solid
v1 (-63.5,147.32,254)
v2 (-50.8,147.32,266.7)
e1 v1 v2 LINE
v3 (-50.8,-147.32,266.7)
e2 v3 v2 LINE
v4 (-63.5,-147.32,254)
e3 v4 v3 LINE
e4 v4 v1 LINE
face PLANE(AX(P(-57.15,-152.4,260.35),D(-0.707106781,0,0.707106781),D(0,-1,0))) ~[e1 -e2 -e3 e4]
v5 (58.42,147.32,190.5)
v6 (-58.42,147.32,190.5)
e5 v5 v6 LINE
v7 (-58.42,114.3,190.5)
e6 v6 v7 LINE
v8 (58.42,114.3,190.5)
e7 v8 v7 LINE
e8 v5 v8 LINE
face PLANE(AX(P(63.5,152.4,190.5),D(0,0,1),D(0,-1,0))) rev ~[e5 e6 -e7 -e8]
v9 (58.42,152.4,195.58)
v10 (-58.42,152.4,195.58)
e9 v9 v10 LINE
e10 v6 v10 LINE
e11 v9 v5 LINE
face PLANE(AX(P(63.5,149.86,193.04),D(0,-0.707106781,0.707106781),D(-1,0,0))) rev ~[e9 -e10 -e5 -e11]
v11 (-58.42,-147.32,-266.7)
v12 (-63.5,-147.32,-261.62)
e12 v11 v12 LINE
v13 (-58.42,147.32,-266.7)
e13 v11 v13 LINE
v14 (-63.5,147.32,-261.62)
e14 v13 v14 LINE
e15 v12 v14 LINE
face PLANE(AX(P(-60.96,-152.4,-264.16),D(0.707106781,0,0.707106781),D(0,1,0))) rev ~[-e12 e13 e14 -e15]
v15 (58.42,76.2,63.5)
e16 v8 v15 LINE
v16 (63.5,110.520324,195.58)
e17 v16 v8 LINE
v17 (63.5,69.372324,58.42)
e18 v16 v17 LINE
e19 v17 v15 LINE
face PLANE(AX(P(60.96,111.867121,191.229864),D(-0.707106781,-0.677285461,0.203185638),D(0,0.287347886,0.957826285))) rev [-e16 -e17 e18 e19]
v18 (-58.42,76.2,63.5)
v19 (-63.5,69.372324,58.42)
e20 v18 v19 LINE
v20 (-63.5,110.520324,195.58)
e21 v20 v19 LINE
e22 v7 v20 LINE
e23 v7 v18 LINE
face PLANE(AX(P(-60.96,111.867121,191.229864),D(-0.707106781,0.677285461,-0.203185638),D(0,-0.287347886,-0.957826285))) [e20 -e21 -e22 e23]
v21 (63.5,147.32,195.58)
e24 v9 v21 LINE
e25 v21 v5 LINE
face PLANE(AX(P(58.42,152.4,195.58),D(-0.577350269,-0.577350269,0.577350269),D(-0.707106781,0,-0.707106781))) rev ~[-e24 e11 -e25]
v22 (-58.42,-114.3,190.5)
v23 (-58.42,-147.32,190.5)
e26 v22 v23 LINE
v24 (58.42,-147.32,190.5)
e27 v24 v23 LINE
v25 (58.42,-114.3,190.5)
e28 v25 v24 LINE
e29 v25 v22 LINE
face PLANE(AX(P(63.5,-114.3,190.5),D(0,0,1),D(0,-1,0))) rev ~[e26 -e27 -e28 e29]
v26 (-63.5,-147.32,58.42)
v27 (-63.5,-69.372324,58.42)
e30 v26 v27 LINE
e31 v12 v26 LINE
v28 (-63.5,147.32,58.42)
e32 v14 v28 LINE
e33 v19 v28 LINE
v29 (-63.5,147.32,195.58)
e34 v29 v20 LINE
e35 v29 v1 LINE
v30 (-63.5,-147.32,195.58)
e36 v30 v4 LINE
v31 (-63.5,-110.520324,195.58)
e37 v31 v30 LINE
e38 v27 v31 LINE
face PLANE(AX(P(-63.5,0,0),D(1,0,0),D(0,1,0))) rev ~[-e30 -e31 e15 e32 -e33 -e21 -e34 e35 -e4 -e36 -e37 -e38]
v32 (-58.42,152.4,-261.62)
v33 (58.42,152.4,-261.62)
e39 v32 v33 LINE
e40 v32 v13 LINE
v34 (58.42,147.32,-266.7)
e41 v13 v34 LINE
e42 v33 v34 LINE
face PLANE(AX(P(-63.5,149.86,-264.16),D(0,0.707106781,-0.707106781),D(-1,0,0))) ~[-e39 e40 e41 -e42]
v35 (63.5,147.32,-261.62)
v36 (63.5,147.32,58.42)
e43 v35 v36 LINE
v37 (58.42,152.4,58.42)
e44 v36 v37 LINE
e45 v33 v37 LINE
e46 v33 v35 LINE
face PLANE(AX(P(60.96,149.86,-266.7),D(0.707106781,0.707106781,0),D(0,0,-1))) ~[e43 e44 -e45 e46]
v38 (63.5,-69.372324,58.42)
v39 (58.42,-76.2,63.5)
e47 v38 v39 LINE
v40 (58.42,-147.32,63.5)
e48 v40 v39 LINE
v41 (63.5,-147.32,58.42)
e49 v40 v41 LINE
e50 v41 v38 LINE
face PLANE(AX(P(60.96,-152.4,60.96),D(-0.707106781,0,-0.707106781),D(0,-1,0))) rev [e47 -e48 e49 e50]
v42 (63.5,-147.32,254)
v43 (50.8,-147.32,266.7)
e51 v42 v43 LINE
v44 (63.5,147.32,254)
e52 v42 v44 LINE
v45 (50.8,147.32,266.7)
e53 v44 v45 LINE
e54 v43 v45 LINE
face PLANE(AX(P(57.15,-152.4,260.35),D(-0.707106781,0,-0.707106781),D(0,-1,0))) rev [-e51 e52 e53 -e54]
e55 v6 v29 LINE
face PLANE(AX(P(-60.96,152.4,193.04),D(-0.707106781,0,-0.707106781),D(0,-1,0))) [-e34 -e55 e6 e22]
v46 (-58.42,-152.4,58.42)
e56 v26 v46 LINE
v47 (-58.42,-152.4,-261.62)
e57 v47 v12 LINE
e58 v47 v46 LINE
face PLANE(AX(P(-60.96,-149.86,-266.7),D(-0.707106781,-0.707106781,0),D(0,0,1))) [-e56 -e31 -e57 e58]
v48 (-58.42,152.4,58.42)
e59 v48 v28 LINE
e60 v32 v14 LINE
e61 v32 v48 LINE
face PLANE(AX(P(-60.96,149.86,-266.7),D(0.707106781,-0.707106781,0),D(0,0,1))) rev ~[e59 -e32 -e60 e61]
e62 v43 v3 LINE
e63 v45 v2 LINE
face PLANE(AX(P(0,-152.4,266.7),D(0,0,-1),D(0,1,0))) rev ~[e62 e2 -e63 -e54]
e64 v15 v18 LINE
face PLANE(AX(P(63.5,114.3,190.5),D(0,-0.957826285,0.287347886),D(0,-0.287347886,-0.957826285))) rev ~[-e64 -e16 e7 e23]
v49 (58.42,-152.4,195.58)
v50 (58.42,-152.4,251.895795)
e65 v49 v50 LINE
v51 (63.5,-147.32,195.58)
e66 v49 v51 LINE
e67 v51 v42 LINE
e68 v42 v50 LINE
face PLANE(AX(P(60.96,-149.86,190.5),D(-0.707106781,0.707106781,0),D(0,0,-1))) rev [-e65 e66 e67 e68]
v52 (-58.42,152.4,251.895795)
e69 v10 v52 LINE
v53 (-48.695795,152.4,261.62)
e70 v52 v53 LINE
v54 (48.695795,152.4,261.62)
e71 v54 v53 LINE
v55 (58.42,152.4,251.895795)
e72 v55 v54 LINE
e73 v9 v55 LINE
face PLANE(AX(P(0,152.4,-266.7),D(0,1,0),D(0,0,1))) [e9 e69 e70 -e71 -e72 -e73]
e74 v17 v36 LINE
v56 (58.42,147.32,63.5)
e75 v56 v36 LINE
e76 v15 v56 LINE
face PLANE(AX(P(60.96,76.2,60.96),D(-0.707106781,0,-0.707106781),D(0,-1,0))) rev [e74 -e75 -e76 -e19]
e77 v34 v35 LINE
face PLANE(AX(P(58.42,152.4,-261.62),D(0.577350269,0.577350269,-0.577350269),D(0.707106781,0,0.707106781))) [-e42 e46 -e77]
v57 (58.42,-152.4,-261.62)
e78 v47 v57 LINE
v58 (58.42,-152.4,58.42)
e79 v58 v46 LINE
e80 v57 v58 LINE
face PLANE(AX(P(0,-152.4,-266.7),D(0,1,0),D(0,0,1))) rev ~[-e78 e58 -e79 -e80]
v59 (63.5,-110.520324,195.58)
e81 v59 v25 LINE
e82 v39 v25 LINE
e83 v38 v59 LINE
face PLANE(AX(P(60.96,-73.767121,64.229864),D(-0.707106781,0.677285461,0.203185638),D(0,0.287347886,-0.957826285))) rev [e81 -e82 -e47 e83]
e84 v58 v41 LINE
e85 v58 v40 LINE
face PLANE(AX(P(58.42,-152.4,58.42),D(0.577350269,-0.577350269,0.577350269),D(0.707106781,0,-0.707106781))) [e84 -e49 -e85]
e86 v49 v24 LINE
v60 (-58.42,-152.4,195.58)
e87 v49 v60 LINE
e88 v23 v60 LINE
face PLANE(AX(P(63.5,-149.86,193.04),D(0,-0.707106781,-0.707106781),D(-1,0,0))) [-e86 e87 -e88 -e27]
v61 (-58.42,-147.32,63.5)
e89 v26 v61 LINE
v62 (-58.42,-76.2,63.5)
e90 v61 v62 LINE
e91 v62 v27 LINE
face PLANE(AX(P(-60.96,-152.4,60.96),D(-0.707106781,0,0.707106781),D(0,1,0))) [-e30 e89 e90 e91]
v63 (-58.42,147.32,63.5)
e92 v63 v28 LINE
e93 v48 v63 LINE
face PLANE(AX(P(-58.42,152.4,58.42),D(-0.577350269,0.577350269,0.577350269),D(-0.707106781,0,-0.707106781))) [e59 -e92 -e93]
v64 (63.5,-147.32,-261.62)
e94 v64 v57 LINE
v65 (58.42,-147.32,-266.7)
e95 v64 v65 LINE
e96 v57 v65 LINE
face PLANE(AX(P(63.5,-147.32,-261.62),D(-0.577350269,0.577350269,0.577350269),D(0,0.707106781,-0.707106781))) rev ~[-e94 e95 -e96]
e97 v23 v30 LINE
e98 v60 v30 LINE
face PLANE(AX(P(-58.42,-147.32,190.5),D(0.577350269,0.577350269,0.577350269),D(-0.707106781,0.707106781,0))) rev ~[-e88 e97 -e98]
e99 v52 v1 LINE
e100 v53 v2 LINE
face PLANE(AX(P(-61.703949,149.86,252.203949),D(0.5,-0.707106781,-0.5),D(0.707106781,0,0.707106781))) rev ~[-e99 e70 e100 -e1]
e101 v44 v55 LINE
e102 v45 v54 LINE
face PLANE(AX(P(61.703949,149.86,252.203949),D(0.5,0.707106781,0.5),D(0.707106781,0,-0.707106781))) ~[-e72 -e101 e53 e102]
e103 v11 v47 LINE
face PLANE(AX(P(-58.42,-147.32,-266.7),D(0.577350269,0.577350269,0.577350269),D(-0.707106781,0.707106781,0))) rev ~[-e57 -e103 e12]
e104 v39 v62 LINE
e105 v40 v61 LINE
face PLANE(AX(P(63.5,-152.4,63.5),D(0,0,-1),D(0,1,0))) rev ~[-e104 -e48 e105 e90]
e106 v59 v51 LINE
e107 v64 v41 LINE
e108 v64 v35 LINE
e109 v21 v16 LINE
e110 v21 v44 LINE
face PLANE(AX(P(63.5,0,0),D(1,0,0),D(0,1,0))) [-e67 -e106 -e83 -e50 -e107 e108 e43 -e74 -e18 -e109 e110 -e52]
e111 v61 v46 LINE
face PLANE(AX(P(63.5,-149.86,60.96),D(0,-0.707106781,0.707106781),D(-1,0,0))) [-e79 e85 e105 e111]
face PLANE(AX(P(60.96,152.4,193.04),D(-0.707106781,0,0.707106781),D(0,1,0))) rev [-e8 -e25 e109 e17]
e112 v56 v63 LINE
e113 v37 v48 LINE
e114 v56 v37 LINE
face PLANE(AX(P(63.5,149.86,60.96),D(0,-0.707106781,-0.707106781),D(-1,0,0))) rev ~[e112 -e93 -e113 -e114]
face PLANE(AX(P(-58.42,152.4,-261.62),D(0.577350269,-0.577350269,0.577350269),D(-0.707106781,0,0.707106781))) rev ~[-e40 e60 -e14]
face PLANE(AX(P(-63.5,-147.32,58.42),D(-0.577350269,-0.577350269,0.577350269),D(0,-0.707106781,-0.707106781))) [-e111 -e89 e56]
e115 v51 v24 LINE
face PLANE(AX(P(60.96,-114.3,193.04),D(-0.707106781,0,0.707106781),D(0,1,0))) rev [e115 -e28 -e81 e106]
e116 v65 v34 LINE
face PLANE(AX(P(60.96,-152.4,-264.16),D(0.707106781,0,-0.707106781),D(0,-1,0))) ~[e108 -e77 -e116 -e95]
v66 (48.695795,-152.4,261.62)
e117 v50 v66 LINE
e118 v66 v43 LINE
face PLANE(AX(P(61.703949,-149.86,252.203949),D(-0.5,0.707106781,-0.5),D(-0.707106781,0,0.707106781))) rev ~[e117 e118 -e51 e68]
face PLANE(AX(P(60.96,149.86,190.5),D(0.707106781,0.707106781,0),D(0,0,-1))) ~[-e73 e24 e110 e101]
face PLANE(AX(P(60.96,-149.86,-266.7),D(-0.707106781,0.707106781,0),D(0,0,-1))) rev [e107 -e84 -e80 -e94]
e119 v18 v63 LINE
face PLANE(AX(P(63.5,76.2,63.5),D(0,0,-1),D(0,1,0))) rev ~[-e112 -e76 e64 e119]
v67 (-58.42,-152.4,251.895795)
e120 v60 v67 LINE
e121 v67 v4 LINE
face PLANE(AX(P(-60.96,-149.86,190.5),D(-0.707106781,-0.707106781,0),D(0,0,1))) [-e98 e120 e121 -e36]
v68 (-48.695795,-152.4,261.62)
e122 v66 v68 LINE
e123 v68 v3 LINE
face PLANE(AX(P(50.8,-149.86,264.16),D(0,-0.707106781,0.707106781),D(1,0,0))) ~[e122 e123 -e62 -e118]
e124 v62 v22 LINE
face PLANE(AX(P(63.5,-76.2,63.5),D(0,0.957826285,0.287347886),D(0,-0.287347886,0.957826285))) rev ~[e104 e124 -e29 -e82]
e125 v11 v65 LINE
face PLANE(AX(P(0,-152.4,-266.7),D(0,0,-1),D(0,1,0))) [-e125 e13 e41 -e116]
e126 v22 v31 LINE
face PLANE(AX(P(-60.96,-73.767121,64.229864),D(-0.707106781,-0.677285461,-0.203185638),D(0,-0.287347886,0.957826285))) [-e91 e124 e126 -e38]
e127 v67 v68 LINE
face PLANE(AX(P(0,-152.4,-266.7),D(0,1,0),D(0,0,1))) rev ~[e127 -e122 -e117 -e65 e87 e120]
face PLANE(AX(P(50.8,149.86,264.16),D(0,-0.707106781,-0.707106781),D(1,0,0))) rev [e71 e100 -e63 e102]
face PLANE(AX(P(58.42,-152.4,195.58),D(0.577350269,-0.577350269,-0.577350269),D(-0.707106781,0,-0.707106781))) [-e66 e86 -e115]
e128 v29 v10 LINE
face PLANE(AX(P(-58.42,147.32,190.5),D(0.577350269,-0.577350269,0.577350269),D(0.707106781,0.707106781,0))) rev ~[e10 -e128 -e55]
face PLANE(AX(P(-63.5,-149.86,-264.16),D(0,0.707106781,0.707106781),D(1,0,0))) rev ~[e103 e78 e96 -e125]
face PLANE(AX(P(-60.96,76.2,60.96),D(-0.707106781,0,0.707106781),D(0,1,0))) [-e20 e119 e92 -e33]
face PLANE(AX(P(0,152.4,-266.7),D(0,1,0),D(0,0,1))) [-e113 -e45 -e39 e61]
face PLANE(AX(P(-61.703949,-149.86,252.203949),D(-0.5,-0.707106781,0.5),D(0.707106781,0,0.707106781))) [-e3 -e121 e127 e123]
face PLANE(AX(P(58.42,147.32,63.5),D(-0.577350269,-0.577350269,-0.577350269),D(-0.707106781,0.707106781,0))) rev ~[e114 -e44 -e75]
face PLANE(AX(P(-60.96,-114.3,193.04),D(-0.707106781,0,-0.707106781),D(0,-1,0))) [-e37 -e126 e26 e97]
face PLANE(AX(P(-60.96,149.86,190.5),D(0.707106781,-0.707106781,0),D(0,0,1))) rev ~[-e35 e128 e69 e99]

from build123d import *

# Parameters (mm, degrees)
F0_W          = 304.8
F0_H          = 533.4
F1_DEPTH      = 63.5
F1_DEPTH_BACK = 63.5
F3_DEPTH      = 127
F4_SIZE       = 12.7
F5_SIZE       = 5.08


# Not quite as in the source:
# - a feature names something its author has since deleted; it is built from what else it names


with BuildPart() as f1:
    # F0 (on Right) → F1 (new body, two sides)
    with BuildSketch(Plane.YZ) as f1_sk:
        Rectangle(F0_W, F0_H)
    extrude(amount=F1_DEPTH)
    extrude(f1_sk.sketch, amount=-F1_DEPTH_BACK)

    # F2 (on face) → F3 (cut, through all)
    with BuildSketch(Plane.YZ.offset(63.5)):
        Polygon((-114.3, 190.5), (-152.4, 190.5), (-152.4, 63.5), (-76.2, 63.5), align=None)
        Polygon((152.4, 190.5), (114.3, 190.5), (76.2, 63.5), (152.4, 63.5), align=None)
    extrude(amount=-F3_DEPTH, mode=Mode.SUBTRACT)

    # F4
    f4_edges = [f1.edges().sort_by_distance(p)[0] for p in [
        (63.5, 0, 266.7),
        (-63.5, 0, 266.7),
    ]]
    chamfer(f4_edges, length=F4_SIZE)

    # F5
    f5_edges = [f1.edges().sort_by_distance(p)[0] for p in [
        (63.5, -114.3, 63.5),
        (63.5, -95.25, 127),
        (63.5, -133.35, 190.5),
        (63.5, -152.4, 222.25),
        (57.15, -152.4, 260.35),
        (0, -152.4, 266.7),
        (-63.5, -152.4, 222.25),
        (0, -152.4, 190.5),
        (0, -152.4, 63.5),
        (-63.5, -114.3, 63.5),
        (-63.5, -95.25, 127),
        (-63.5, -133.35, 190.5),
        (-57.15, -152.4, 260.35),
        (-63.5, -152.4, -101.6),
        (0, -152.4, -266.7),
        (63.5, -152.4, -101.6),
        (-63.5, 0, -266.7),
        (63.5, 0, -266.7),
        (0, 152.4, -266.7),
        (63.5, 152.4, -101.6),
        (63.5, 114.3, 63.5),
        (63.5, 95.25, 127),
        (63.5, 133.35, 190.5),
        (63.5, 152.4, 222.25),
        (57.15, 152.4, 260.35),
        (0, 152.4, 266.7),
        (-57.15, 152.4, 260.35),
        (-63.5, 152.4, 222.25),
        (-63.5, 133.35, 190.5),
        (-63.5, 95.25, 127),
        (0, 152.4, 190.5),
        (-63.5, 114.3, 63.5),
        (0, 152.4, 63.5),
        (-63.5, 152.4, -101.6),
    ]]
    chamfer(f5_edges, length=F5_SIZE)


solid = f1.part
